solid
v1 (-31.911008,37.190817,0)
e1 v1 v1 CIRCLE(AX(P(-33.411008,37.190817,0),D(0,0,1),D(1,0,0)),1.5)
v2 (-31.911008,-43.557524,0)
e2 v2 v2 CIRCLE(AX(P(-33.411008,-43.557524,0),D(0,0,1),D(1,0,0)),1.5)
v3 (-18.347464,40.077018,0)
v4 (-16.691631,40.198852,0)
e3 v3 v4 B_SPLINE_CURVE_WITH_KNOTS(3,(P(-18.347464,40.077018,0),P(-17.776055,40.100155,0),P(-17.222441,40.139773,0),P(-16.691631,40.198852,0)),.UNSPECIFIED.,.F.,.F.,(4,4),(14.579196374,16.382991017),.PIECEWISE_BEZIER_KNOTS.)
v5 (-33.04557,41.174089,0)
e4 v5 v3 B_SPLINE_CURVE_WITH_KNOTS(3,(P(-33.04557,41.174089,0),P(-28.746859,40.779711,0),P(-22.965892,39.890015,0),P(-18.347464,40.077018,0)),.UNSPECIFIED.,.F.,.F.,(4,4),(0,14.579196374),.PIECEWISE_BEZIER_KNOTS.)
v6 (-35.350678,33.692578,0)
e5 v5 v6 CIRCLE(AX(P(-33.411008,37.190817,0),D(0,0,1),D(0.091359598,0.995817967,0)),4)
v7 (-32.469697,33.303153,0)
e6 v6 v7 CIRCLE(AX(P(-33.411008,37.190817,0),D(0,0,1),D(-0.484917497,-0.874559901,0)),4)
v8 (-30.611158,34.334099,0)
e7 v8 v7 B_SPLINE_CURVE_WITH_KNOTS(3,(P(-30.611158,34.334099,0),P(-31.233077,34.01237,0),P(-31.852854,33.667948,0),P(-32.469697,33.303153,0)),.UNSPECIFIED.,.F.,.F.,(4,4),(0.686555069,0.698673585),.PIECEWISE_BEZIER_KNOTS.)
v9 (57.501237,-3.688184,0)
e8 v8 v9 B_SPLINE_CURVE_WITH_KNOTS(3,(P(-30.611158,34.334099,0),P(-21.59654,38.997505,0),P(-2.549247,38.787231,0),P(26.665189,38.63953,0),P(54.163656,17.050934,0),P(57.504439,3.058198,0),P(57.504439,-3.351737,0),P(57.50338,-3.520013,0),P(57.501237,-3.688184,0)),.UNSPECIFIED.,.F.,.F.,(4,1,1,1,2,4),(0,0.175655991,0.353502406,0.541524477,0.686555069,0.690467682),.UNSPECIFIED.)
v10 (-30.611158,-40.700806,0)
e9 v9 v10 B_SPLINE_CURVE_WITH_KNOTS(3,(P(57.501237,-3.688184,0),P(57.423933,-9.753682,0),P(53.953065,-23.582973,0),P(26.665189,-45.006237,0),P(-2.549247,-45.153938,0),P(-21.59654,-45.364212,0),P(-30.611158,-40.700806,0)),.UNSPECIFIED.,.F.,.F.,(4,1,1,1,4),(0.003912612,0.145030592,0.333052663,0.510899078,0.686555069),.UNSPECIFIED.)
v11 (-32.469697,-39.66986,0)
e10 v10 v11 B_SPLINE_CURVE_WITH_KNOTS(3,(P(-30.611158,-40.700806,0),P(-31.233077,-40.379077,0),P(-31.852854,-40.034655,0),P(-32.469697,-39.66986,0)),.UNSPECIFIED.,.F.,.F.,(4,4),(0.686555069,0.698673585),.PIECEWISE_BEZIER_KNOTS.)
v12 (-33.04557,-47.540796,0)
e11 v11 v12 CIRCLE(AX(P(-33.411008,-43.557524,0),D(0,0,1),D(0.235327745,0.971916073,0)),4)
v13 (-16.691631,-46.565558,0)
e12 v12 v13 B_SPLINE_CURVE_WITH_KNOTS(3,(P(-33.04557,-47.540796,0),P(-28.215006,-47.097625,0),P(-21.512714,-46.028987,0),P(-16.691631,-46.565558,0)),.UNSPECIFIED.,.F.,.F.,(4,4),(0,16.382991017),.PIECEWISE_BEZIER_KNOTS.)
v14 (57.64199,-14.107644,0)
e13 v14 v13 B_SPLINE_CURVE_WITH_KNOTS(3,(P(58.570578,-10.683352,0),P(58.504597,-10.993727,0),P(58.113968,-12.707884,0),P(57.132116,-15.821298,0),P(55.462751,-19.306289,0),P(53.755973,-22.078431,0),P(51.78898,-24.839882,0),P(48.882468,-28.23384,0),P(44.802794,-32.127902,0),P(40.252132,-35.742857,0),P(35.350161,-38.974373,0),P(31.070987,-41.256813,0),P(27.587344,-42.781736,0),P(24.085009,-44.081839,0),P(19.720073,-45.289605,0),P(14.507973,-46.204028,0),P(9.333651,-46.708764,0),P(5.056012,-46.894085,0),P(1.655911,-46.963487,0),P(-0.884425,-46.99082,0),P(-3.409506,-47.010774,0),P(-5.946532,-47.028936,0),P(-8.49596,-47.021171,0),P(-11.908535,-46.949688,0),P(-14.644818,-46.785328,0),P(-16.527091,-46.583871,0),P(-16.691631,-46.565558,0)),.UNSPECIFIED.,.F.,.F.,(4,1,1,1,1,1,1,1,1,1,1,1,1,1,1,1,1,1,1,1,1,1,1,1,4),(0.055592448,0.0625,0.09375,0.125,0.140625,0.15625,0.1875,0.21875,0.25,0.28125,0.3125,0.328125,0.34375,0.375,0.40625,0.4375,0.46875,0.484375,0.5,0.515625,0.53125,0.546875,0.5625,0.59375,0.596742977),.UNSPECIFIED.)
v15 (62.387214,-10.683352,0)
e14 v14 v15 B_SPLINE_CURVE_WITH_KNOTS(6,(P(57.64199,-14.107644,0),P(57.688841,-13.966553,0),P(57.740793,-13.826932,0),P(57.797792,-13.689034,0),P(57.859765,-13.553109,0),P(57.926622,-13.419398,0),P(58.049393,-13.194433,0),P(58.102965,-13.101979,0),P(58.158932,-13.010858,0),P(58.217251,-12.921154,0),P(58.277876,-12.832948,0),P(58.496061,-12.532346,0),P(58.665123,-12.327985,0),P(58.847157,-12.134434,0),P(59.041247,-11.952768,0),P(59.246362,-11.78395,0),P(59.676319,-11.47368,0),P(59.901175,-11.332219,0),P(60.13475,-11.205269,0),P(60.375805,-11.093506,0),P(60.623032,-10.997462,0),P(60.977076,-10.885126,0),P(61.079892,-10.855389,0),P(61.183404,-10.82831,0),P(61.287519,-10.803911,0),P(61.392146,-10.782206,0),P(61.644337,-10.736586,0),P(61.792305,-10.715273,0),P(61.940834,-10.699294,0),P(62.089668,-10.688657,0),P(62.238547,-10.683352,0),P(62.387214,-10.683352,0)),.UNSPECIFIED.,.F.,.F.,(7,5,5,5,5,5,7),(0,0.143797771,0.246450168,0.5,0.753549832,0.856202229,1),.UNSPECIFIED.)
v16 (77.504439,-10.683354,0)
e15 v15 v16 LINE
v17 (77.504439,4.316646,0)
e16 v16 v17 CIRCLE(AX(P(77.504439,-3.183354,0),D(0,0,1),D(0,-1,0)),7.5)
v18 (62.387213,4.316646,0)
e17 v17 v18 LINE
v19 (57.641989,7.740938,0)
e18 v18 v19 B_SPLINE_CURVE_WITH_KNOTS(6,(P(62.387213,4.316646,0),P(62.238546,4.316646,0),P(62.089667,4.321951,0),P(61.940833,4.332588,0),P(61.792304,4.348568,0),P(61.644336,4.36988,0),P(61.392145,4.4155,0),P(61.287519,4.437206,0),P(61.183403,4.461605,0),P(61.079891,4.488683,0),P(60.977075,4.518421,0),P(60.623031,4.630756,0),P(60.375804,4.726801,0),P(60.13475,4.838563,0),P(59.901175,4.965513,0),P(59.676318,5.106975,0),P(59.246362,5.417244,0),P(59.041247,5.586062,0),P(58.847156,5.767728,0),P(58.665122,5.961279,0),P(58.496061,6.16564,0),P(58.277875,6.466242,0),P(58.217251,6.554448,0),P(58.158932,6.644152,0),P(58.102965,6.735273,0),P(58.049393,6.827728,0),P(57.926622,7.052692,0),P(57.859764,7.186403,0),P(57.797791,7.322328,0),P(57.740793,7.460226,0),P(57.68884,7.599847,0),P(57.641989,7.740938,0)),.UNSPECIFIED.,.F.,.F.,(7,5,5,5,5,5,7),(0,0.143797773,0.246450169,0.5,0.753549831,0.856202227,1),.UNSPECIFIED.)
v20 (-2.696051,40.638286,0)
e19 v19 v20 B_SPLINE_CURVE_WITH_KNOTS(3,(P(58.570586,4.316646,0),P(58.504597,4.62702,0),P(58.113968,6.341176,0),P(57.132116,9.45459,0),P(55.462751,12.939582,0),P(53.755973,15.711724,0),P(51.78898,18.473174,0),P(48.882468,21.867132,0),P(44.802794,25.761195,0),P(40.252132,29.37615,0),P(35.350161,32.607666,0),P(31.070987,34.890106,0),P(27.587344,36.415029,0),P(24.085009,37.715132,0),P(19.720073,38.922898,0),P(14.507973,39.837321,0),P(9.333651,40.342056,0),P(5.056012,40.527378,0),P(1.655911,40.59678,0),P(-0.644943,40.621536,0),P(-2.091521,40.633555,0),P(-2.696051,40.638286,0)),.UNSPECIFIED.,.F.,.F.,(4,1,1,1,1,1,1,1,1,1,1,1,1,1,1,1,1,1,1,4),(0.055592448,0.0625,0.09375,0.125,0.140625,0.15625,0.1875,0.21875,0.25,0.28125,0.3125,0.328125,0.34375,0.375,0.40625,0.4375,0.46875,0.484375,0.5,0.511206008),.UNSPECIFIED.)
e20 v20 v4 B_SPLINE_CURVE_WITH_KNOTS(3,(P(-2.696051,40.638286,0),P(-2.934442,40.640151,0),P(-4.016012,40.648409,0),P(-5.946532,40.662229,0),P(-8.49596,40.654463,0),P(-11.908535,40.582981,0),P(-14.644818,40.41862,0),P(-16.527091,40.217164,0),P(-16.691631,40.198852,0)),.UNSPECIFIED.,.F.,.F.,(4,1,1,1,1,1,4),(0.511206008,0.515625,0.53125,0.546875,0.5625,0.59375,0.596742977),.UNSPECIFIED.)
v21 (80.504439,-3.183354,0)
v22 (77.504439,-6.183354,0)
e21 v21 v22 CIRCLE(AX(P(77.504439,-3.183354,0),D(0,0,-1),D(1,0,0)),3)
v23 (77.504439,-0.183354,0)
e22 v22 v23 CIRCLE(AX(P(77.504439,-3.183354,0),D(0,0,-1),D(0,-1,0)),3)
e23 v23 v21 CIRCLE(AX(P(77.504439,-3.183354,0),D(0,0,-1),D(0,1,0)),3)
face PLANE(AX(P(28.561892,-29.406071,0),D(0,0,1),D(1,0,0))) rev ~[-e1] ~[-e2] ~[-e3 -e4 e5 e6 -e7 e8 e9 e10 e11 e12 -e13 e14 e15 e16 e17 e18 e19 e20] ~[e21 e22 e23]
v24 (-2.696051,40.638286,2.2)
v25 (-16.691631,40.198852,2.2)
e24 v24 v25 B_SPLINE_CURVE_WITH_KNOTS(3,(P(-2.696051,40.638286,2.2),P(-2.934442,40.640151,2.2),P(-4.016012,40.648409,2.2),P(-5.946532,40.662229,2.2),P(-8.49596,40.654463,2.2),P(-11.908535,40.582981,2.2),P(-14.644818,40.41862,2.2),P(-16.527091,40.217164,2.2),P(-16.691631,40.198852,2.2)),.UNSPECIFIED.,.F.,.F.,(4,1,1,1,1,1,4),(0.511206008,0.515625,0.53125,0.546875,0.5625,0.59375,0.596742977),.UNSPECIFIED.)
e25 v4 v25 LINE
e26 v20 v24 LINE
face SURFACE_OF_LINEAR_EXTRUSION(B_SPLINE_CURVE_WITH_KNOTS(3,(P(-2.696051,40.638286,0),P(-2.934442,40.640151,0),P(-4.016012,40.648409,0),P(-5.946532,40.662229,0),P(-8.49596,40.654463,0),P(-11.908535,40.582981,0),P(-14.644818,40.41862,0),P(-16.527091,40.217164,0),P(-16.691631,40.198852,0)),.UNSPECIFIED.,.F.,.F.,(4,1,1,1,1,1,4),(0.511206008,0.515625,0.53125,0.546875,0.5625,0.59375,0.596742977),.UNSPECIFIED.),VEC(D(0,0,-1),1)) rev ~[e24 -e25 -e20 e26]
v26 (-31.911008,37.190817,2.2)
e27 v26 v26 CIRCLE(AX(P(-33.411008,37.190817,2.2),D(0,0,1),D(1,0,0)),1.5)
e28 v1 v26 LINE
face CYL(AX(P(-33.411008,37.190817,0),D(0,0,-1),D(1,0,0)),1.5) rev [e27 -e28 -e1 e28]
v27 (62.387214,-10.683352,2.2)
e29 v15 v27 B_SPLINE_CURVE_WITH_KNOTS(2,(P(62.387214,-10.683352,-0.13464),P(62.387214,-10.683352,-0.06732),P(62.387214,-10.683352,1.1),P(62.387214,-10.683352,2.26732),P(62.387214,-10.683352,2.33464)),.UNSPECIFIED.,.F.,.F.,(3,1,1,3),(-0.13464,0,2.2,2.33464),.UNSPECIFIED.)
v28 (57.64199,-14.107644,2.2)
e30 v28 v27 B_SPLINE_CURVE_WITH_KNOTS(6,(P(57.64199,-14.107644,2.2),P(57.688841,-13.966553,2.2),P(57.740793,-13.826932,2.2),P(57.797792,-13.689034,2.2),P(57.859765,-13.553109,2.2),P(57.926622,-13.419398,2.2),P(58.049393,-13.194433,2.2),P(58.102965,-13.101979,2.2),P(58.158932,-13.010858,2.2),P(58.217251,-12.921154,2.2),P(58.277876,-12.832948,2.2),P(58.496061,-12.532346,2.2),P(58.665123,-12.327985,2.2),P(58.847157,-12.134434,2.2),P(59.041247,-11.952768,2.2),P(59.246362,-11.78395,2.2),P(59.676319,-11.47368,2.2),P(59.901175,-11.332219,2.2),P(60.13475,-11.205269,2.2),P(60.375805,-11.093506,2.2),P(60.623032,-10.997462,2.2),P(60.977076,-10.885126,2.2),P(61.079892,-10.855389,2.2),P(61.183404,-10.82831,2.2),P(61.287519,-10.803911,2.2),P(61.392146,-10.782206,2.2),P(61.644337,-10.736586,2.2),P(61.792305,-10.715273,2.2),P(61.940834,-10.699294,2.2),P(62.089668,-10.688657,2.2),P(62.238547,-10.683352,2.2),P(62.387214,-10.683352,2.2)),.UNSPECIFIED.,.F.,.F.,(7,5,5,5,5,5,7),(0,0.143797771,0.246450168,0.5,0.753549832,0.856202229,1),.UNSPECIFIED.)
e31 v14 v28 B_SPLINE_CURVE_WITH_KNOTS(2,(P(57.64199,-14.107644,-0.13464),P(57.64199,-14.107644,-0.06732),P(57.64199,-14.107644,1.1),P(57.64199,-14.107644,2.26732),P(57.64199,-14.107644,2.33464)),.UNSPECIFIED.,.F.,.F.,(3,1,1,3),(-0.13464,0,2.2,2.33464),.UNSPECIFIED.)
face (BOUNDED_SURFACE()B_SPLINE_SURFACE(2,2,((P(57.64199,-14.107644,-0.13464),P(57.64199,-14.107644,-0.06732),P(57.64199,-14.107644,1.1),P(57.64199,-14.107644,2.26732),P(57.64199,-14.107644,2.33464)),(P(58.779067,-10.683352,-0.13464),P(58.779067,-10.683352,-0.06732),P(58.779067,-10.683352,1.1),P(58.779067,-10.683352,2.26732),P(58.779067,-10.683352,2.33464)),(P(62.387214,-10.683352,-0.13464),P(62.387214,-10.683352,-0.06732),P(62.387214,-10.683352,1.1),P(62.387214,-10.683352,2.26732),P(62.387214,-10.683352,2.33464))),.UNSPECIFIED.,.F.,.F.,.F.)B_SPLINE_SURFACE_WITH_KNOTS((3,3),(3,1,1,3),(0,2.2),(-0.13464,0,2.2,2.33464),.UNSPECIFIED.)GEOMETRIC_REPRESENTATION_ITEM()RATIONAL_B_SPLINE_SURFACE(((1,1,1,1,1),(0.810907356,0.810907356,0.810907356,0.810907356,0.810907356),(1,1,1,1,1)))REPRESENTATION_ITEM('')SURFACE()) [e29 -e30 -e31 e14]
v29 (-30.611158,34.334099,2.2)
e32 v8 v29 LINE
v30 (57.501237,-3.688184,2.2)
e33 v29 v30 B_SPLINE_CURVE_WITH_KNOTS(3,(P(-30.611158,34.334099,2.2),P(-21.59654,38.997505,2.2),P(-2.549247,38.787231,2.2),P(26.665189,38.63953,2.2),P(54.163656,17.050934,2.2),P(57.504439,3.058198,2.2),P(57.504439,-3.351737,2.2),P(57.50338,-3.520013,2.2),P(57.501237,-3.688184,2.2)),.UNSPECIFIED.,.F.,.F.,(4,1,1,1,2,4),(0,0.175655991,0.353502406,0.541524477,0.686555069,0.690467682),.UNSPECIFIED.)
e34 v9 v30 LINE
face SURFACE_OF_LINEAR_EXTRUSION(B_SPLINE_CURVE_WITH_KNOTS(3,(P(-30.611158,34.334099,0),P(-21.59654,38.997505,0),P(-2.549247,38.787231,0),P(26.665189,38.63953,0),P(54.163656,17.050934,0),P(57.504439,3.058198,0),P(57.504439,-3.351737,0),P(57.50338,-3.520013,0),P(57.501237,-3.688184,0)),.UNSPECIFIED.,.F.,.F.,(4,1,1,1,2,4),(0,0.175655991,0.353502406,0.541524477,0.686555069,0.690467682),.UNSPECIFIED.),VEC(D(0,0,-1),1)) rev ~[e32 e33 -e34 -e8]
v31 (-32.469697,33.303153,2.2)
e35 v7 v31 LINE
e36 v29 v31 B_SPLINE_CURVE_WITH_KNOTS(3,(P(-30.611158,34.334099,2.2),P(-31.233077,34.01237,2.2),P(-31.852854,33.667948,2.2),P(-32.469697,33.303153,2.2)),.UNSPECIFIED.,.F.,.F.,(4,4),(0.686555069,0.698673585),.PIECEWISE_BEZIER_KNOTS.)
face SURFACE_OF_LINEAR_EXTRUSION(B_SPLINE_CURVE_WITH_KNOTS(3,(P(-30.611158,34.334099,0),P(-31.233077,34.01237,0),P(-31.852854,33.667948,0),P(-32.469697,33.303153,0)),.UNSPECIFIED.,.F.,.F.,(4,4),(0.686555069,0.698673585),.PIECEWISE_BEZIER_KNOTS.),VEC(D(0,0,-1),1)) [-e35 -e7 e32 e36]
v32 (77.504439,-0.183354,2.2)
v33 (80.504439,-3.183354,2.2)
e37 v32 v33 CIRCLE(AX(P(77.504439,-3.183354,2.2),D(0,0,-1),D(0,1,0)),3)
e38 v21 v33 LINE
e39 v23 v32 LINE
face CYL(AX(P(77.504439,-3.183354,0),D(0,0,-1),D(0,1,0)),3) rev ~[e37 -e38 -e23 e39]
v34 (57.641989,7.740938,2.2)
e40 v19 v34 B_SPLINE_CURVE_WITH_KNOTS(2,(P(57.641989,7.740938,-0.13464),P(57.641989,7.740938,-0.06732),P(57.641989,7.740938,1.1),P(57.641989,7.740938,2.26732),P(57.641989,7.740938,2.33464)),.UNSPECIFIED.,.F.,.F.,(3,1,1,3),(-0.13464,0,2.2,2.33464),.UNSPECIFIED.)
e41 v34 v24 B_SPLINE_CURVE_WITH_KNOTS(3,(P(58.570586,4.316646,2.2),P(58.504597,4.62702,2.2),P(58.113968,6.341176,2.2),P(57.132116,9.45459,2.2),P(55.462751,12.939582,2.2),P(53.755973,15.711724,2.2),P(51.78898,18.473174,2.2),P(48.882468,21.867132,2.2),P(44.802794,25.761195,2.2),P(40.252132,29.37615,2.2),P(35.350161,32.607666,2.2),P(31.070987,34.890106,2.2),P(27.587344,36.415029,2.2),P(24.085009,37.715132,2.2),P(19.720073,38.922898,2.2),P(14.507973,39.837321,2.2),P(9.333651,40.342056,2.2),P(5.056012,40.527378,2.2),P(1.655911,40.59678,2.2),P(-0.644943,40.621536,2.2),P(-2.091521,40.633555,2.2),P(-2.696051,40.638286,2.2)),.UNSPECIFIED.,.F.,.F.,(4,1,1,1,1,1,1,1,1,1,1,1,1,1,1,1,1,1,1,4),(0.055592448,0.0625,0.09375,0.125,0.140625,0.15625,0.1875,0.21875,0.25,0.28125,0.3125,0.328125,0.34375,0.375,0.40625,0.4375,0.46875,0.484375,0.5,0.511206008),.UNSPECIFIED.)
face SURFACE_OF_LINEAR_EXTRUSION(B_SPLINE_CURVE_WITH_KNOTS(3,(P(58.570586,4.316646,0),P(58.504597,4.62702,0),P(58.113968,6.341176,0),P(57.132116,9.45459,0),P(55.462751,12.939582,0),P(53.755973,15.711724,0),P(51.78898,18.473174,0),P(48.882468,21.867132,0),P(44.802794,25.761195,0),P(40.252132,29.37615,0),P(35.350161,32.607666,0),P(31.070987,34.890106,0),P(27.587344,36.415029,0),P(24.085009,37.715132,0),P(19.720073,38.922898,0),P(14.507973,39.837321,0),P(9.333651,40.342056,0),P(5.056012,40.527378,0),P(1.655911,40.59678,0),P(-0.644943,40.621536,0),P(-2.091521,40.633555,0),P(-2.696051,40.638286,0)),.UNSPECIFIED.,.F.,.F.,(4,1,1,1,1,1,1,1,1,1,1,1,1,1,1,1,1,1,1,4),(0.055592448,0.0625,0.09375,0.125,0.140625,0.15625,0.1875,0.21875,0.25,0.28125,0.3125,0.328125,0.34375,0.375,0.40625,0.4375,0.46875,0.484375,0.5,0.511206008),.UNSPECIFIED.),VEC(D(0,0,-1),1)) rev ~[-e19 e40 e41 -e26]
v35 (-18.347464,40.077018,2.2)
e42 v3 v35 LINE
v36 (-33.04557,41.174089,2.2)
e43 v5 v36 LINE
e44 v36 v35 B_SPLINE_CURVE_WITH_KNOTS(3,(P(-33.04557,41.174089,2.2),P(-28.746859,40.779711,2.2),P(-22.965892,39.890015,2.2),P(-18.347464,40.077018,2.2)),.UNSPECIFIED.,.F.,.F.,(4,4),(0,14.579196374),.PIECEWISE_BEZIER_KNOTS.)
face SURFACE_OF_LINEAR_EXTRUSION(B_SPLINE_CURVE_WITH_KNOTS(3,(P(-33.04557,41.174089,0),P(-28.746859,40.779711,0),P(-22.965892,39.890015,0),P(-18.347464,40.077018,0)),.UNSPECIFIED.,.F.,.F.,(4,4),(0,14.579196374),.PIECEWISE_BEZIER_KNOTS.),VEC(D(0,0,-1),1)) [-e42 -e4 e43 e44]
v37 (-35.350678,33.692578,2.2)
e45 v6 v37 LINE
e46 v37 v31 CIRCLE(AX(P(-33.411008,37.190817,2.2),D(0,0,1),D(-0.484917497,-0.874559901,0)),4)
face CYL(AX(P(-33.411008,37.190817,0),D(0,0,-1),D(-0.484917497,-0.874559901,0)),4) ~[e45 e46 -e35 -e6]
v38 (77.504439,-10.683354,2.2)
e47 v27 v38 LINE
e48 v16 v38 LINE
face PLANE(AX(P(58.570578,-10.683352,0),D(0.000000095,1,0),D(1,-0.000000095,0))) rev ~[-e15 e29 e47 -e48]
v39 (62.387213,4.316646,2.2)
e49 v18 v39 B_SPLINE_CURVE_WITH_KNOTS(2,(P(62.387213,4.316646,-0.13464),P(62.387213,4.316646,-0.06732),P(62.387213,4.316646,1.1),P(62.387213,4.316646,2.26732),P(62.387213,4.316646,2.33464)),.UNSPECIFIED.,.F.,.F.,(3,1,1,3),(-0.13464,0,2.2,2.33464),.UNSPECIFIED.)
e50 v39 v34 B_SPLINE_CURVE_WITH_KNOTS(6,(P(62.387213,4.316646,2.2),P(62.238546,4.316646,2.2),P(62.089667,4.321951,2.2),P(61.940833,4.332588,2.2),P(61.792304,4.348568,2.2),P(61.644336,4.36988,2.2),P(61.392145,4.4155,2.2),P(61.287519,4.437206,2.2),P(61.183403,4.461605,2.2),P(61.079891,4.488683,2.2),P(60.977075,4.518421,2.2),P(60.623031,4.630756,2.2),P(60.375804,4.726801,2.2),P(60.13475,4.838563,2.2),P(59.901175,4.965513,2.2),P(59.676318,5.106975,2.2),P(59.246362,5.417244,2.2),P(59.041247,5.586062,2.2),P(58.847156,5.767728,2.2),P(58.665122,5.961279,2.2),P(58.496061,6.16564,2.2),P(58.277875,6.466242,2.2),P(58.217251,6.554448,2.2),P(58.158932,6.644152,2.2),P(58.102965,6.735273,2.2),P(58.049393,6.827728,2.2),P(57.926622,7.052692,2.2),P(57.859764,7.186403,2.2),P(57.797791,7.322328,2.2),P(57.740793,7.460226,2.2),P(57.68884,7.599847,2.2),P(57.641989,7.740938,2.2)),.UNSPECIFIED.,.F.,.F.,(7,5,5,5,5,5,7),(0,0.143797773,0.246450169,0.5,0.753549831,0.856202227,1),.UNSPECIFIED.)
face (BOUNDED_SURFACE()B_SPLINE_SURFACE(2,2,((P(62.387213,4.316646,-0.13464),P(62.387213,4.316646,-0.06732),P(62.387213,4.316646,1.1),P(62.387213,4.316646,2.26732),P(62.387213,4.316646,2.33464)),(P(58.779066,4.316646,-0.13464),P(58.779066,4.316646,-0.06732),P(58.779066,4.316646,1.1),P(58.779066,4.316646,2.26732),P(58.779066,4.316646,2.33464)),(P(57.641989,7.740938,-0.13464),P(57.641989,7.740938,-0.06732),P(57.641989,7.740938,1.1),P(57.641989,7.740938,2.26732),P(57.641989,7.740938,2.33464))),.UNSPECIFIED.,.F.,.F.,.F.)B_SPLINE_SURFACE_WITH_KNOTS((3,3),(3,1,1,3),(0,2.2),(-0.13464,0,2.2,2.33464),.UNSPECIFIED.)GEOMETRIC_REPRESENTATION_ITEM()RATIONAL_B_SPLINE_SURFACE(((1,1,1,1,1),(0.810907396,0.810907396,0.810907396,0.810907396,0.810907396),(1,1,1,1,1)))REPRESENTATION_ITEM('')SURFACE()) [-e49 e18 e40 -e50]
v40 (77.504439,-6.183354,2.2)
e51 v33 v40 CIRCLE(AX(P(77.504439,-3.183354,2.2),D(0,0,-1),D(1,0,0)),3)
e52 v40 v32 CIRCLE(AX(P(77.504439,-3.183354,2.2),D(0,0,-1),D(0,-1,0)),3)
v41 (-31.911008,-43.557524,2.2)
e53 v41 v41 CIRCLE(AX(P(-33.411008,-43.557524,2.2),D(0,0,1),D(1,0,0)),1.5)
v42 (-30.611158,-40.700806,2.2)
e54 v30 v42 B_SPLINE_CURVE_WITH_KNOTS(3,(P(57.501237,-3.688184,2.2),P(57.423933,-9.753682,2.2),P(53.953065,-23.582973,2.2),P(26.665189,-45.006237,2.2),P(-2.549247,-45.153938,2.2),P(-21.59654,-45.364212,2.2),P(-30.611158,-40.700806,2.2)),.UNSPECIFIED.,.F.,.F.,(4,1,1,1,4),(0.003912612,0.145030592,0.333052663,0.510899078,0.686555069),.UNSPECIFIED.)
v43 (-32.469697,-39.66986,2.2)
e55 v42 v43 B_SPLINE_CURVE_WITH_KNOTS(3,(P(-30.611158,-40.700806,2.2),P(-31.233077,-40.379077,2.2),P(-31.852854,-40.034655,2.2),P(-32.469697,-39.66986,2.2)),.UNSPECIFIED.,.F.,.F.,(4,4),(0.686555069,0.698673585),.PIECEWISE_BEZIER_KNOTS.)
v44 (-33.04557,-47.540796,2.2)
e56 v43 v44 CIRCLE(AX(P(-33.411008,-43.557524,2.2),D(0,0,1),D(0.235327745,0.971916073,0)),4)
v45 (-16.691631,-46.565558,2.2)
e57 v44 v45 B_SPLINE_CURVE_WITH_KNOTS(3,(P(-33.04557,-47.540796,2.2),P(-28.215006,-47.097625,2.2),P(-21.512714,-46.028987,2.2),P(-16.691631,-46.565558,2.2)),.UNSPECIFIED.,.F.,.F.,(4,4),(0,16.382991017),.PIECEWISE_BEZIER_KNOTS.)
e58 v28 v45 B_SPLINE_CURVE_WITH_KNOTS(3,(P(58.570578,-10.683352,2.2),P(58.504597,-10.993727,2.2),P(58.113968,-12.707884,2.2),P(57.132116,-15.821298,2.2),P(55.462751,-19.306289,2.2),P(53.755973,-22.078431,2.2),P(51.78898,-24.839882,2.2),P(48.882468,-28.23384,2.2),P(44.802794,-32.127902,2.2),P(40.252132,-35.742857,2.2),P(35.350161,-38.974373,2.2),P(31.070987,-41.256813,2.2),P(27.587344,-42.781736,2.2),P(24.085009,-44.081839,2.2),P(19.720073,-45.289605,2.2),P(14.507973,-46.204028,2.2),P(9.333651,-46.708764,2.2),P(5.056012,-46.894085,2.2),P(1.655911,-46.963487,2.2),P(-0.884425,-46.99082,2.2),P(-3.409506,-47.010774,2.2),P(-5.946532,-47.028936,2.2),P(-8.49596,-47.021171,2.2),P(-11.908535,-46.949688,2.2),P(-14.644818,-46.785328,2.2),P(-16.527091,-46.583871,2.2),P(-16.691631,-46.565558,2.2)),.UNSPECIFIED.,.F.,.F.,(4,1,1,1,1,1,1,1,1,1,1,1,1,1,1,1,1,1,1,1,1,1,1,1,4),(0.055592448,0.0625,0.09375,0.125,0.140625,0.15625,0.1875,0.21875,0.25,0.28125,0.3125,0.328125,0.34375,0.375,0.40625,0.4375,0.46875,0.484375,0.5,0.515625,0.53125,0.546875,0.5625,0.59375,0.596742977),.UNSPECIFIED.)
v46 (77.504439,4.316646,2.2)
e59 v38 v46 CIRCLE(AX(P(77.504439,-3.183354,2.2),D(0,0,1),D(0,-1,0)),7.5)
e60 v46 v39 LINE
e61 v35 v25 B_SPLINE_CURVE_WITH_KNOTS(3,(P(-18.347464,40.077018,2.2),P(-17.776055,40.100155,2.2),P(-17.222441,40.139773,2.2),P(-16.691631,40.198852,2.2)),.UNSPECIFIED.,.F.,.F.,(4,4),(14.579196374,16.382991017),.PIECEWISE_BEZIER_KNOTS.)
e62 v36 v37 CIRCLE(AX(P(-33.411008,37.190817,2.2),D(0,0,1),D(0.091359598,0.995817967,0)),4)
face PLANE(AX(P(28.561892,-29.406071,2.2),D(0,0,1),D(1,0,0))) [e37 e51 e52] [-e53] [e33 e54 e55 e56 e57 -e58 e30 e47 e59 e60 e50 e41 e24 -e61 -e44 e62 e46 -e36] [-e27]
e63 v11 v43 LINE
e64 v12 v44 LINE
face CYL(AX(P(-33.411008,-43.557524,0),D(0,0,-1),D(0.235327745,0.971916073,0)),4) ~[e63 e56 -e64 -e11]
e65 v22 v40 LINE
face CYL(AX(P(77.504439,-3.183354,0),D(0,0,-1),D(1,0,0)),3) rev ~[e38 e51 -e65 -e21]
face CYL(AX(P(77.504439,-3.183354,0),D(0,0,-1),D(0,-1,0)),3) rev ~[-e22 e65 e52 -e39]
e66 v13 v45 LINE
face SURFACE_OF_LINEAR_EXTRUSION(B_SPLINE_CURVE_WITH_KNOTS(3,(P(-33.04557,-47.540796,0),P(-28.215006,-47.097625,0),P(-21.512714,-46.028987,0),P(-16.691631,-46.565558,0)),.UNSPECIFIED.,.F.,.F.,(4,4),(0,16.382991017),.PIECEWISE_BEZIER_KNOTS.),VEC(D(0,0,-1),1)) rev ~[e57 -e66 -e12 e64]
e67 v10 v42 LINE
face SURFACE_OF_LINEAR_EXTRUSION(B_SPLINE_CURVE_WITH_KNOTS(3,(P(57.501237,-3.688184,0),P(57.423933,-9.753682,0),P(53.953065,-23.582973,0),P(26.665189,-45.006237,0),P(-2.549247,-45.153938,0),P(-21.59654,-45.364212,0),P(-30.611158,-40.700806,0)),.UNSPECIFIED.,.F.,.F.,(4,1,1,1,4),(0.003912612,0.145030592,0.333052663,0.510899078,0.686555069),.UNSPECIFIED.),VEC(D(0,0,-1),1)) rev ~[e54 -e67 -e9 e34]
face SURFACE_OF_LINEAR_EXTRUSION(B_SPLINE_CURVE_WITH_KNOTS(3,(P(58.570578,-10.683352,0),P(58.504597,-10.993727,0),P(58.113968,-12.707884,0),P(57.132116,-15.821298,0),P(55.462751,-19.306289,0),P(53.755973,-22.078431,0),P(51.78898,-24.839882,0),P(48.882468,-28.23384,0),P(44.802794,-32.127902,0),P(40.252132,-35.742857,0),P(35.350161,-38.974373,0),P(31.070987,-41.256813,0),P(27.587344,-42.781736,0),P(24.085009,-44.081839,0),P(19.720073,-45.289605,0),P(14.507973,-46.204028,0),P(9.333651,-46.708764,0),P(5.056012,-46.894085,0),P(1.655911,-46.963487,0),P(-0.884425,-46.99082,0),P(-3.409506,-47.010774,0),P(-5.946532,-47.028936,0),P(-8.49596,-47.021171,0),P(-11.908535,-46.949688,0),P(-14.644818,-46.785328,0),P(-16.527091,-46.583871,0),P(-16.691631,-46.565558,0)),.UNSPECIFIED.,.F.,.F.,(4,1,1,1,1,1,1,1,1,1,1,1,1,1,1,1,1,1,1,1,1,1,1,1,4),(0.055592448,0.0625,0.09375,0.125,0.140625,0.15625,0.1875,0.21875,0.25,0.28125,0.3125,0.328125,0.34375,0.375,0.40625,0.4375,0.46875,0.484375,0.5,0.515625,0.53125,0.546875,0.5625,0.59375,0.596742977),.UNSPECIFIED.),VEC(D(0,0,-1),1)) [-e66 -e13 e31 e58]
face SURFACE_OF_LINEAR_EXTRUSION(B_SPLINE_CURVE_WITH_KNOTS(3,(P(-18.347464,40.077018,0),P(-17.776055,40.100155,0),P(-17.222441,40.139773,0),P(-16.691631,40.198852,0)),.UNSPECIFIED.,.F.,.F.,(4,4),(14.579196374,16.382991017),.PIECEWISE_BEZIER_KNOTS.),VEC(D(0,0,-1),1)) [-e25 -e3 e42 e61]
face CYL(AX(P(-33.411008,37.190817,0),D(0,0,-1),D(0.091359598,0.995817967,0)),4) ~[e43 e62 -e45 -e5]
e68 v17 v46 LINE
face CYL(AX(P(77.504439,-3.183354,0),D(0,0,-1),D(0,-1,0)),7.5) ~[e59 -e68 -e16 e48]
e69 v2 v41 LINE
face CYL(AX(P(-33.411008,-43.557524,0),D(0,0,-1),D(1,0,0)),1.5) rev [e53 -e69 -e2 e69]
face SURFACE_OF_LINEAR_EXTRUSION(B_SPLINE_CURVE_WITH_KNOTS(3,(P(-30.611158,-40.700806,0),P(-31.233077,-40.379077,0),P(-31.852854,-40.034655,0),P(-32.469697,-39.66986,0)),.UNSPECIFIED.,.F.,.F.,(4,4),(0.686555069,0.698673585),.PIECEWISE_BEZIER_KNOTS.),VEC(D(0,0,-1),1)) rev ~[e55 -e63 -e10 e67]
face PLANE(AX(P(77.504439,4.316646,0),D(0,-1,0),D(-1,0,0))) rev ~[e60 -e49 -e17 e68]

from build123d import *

# Parameters (mm, degrees)
F0_R     = 1.5
F1_DEPTH = 2.2
F2_R     = 5


# Not quite as in the source:
# - ends of sketch curves that miss each other by under 0.0002 mm in the source are joined
# - the dataset's text gives a spline's control points without its knots; the knots are read off the source's solid


with BuildPart() as f1:
    # F0 (on Top) → F1 (new body)
    with BuildSketch(Plane.XY):
        with BuildLine():
            add(Edge.make_bspline(
                [(-30.6111583346, -40.7008057443), (-31.233077321, -40.3790771173), (-31.8528544001, -40.0346551051), (-32.469697118, -39.6698600783)],
                knots=[0.6865550694, 0.6865550694, 0.6865550694, 0.6865550694, 0.698673585, 0.698673585, 0.698673585, 0.698673585], degree=3))
            ThreePointArc((-32.469697118, -39.6698600783), (-37.400344821, -43.2656468064), (-33.0455697059, -47.5407962381))
            add(Edge.make_bspline(
                [(-33.0455697059, -47.5407962381), (-28.2150059427, -47.0976245157), (-21.512714319, -46.0289871022), (-16.6916312134, -46.5655575872)],
                knots=[0, 0, 0, 0, 16.3829910165, 16.3829910165, 16.3829910165, 16.3829910165], degree=3))
            add(Edge.make_bspline(
                [(58.5705779891, -10.6833517733), (58.5045966245, -10.9937274451), (58.1139682264, -12.7078835649), (57.1321161632, -15.8212976201), (55.4627512009, -19.3062888881), (53.7559729129, -22.0784311932), (51.7889797877, -24.8398815578), (48.8824684734, -28.233839645), (44.8027944584, -32.1279022255), (40.2521320917, -35.7428568059), (35.3501612154, -38.9743729453), (31.0709874957, -41.2568133399), (27.5873440069, -42.7817363934), (24.0850094319, -44.0818391055), (19.7200729084, -45.2896051132), (14.5079732054, -46.2040279233), (9.333650913, -46.7087635295), (5.0560116744, -46.8940848045), (1.6559105615, -46.9634870038), (-0.8844247603, -46.9908203291), (-3.4095063019, -47.0107743311), (-5.9465324466, -47.0289364293), (-8.4959599535, -47.0211705077), (-11.9085350935, -46.9496883405), (-14.6448180595, -46.7853276586), (-16.5270909923, -46.5838707043), (-16.6916312134, -46.5655575872)],
                knots=[0.0555924477, 0.0555924477, 0.0555924477, 0.0555924477, 0.0625, 0.09375, 0.125, 0.140625, 0.15625, 0.1875, 0.21875, 0.25, 0.28125, 0.3125, 0.328125, 0.34375, 0.375, 0.40625, 0.4375, 0.46875, 0.484375, 0.5, 0.515625, 0.53125, 0.546875, 0.5625, 0.59375, 0.5967429767, 0.5967429767, 0.5967429767, 0.5967429767], degree=3))
            Line((58.5705779891, -10.6833517733), (77.5044386559, -10.6833535796))
            ThreePointArc((77.5044386559, -10.6833535796), (85.0044386559, -3.1833535796), (77.5044386559, 4.3166464204))
            Line((77.5044386559, 4.3166464204), (58.6926016813, 4.3166464204))
            add(Edge.make_bspline(
                [(59.3254850017, -3.1833535832), (60.0342853265, -2.7966780854), (58.8687853693, -1.6734940692), (59.3856047623, 0.8985285026), (58.9622009071, 3.1879456463), (58.6926016813, 4.3166464204)],
                knots=[0, 0, 0, 0, 0.0130384822, 0.0314878463, 0.049315333, 0.049315333, 0.049315333, 0.049315333], degree=3))
            add(Edge.make_bspline(
                [(57.5012365496, -3.6881837366), (58.3665907715, -3.5375700684), (58.9841699395, -3.3695529499), (59.3254850017, -3.1833535832)],
                knots=[0.9937214612, 0.9937214612, 0.9937214612, 0.9937214612, 1, 1, 1, 1], degree=3))
            add(Edge.make_bspline(
                [(57.5012365496, -3.6881837366), (57.4239325318, -9.7536818174), (53.9530648244, -23.5829729529), (26.6651894068, -45.0062374143), (-2.5492473673, -45.1539383898), (-21.5965397706, -45.3642119383), (-30.6111583346, -40.7008057443)],
                knots=[0.0039126122, 0.0039126122, 0.0039126122, 0.0039126122, 0.1450305925, 0.333052663, 0.5108990784, 0.6865550694, 0.6865550694, 0.6865550694, 0.6865550694], degree=3))
        make_face()
        with Locations((-33.4110080981, -43.5575243692)):
            Circle(F0_R, mode=Mode.SUBTRACT)
        with BuildLine():
            ThreePointArc((77.5044386559, -6.1833535796), (74.5044386559, -3.1833535796), (77.5044386559, -0.1833535796))
            ThreePointArc((77.5044386559, -0.1833535796), (79.6257589995, -1.062033236), (80.5044386559, -3.1833535796))
            ThreePointArc((80.5044386559, -3.1833535796), (79.6257589995, -5.3046739232), (77.5044386559, -6.1833535796))
        make_face(mode=Mode.SUBTRACT)
        with BuildLine():
            ThreePointArc((-35.3506780872, 33.692577605), (-33.9468187682, 33.2268662862), (-32.469697118, 33.3031529191))
            add(Edge.make_bspline(
                [(-30.6111583346, 34.3340985851), (-31.233077321, 34.0123699581), (-31.8528544001, 33.6679479459), (-32.469697118, 33.3031529191)],
                knots=[0.6865550694, 0.6865550694, 0.6865550694, 0.6865550694, 0.698673585, 0.698673585, 0.698673585, 0.698673585], degree=3))
            add(Edge.make_bspline(
                [(57.5044386559, -3.1833535796), (57.5044386559, 3.0581977794), (54.1636559986, 17.0509341089), (26.6651894068, 38.6395302551), (-2.5492473673, 38.7872312306), (-21.5965397706, 38.9975047791), (-30.6111583346, 34.3340985851)],
                knots=[0, 0, 0, 0, 0.1450305925, 0.333052663, 0.5108990784, 0.6865550694, 0.6865550694, 0.6865550694, 0.6865550694], degree=3))
            add(Edge.make_bspline(
                [(57.5044386559, -3.1833535796), (57.5044386559, -3.3517371584), (57.5033798672, -3.5200128066), (57.5012365496, -3.6881837366)],
                knots=[0, 0, 0, 0, 0.0039126122, 0.0039126122, 0.0039126122, 0.0039126122], degree=3))
            add(Edge.make_bspline(
                [(57.5012365496, -3.6881837366), (58.3665907715, -3.5375700684), (58.9841699395, -3.3695529499), (59.3254850017, -3.1833535832)],
                knots=[0.9937214612, 0.9937214612, 0.9937214612, 0.9937214612, 1, 1, 1, 1], degree=3))
            add(Edge.make_bspline(
                [(59.3254850017, -3.1833535832), (60.0342853265, -2.7966780854), (58.8687853693, -1.6734940692), (59.3856047623, 0.8985285026), (58.9622009071, 3.1879456463), (58.6926016813, 4.3166464204)],
                knots=[0, 0, 0, 0, 0.0130384822, 0.0314878463, 0.049315333, 0.049315333, 0.049315333, 0.049315333], degree=3))
            Line((58.6926016813, 4.3166464204), (58.5705864982, 4.3166464204))
            add(Edge.make_bspline(
                [(58.5705864982, 4.3166464204), (58.5045966245, 4.6270202787), (58.1139682264, 6.3411763984), (57.1321161632, 9.4545904537), (55.4627512009, 12.9395817217), (53.7559729129, 15.7117240268), (51.7889797877, 18.4731743913), (48.8824684734, 21.8671324785), (44.8027944584, 25.7611950591), (40.2521320917, 29.3761496394), (35.3501612154, 32.6076657789), (31.0709874957, 34.8901061735), (27.5873440069, 36.4150292269), (24.0850094319, 37.7151319391), (19.7200729084, 38.9228979468), (14.5079732054, 39.8373207569), (9.333650913, 40.3420563631), (5.0560116744, 40.5273776381), (1.6559105615, 40.5967798374), (-0.6449427019, 40.6215364001), (-2.0915209967, 40.6335552581), (-2.6960509898, 40.6382858746)],
                knots=[0.0555924477, 0.0555924477, 0.0555924477, 0.0555924477, 0.0625, 0.09375, 0.125, 0.140625, 0.15625, 0.1875, 0.21875, 0.25, 0.28125, 0.3125, 0.328125, 0.34375, 0.375, 0.40625, 0.4375, 0.46875, 0.484375, 0.5, 0.511206008, 0.511206008, 0.511206008, 0.511206008], degree=3))
            add(Edge.make_bspline(
                [(-2.6960509898, 40.6382858746), (-2.9344421468, 40.6401513521), (-4.0160115872, 40.6484090232), (-5.9465324466, 40.6622292629), (-8.4959599535, 40.6544633413), (-11.9085350935, 40.5829811741), (-14.6448180595, 40.4186204922), (-16.5270909923, 40.2171635379), (-16.6916314281, 40.1988523389)],
                knots=[0.511206008, 0.511206008, 0.511206008, 0.511206008, 0.515625, 0.53125, 0.546875, 0.5625, 0.59375, 0.5967429767, 0.5967429767, 0.5967429767, 0.5967429767], degree=3))
            add(Edge.make_bspline(
                [(-18.3474642287, 40.0770180524), (-17.7760545185, 40.1001547528), (-17.2224405061, 40.1397731224), (-16.6916314281, 40.1988523389)],
                knots=[14.5791963744, 14.5791963744, 14.5791963744, 14.5791963744, 16.3829910165, 16.3829910165, 16.3829910165, 16.3829910165], degree=3))
            add(Edge.make_bspline(
                [(-18.3474642287, 40.0770180524), (-19.3628733695, 39.9392326528), (-22.0032579926, 39.5041891519), (-25.5922390173, 38.5279804037), (-29.0379906327, 37.1641344821), (-31.629223055, 35.9417528172), (-33.6064465264, 34.8002248895), (-34.9272694884, 33.9676196507), (-35.3506780872, 33.692577605)],
                knots=[0.5489272334, 0.5489272334, 0.5489272334, 0.5489272334, 0.5635582322, 0.5867417108, 0.6077658408, 0.6262201744, 0.6449115004, 0.6534319228, 0.6534319228, 0.6534319228, 0.6534319228], degree=3))
        make_face()
        with BuildLine():
            ThreePointArc((-33.0455697059, 41.1740890789), (-37.2336779457, 38.368609737), (-35.3506780872, 33.692577605))
            add(Edge.make_bspline(
                [(-18.3474642287, 40.0770180524), (-19.3628733695, 39.9392326528), (-22.0032579926, 39.5041891519), (-25.5922390173, 38.5279804037), (-29.0379906327, 37.1641344821), (-31.629223055, 35.9417528172), (-33.6064465264, 34.8002248895), (-34.9272694884, 33.9676196507), (-35.3506780872, 33.692577605)],
                knots=[0.5489272334, 0.5489272334, 0.5489272334, 0.5489272334, 0.5635582322, 0.5867417108, 0.6077658408, 0.6262201744, 0.6449115004, 0.6534319228, 0.6534319228, 0.6534319228, 0.6534319228], degree=3))
            add(Edge.make_bspline(
                [(-33.0455697059, 41.1740890789), (-28.7468590717, 40.7797113024), (-22.9658915055, 39.8900153359), (-18.3474642287, 40.0770180524)],
                knots=[0, 0, 0, 0, 14.5791963744, 14.5791963744, 14.5791963744, 14.5791963744], degree=3))
        make_face()
        with Locations((-33.4110080981, 37.19081721)):
            Circle(F0_R, mode=Mode.SUBTRACT)
    extrude(amount=F1_DEPTH)

    # F2
    f2_edges = [f1.edges().sort_by_distance(p)[0] for p in [
        (58.570578, -10.683352, 1.1),
        (58.570586, 4.316646, 1.1),
    ]]
    fillet(f2_edges, radius=F2_R)


solid = f1.part
